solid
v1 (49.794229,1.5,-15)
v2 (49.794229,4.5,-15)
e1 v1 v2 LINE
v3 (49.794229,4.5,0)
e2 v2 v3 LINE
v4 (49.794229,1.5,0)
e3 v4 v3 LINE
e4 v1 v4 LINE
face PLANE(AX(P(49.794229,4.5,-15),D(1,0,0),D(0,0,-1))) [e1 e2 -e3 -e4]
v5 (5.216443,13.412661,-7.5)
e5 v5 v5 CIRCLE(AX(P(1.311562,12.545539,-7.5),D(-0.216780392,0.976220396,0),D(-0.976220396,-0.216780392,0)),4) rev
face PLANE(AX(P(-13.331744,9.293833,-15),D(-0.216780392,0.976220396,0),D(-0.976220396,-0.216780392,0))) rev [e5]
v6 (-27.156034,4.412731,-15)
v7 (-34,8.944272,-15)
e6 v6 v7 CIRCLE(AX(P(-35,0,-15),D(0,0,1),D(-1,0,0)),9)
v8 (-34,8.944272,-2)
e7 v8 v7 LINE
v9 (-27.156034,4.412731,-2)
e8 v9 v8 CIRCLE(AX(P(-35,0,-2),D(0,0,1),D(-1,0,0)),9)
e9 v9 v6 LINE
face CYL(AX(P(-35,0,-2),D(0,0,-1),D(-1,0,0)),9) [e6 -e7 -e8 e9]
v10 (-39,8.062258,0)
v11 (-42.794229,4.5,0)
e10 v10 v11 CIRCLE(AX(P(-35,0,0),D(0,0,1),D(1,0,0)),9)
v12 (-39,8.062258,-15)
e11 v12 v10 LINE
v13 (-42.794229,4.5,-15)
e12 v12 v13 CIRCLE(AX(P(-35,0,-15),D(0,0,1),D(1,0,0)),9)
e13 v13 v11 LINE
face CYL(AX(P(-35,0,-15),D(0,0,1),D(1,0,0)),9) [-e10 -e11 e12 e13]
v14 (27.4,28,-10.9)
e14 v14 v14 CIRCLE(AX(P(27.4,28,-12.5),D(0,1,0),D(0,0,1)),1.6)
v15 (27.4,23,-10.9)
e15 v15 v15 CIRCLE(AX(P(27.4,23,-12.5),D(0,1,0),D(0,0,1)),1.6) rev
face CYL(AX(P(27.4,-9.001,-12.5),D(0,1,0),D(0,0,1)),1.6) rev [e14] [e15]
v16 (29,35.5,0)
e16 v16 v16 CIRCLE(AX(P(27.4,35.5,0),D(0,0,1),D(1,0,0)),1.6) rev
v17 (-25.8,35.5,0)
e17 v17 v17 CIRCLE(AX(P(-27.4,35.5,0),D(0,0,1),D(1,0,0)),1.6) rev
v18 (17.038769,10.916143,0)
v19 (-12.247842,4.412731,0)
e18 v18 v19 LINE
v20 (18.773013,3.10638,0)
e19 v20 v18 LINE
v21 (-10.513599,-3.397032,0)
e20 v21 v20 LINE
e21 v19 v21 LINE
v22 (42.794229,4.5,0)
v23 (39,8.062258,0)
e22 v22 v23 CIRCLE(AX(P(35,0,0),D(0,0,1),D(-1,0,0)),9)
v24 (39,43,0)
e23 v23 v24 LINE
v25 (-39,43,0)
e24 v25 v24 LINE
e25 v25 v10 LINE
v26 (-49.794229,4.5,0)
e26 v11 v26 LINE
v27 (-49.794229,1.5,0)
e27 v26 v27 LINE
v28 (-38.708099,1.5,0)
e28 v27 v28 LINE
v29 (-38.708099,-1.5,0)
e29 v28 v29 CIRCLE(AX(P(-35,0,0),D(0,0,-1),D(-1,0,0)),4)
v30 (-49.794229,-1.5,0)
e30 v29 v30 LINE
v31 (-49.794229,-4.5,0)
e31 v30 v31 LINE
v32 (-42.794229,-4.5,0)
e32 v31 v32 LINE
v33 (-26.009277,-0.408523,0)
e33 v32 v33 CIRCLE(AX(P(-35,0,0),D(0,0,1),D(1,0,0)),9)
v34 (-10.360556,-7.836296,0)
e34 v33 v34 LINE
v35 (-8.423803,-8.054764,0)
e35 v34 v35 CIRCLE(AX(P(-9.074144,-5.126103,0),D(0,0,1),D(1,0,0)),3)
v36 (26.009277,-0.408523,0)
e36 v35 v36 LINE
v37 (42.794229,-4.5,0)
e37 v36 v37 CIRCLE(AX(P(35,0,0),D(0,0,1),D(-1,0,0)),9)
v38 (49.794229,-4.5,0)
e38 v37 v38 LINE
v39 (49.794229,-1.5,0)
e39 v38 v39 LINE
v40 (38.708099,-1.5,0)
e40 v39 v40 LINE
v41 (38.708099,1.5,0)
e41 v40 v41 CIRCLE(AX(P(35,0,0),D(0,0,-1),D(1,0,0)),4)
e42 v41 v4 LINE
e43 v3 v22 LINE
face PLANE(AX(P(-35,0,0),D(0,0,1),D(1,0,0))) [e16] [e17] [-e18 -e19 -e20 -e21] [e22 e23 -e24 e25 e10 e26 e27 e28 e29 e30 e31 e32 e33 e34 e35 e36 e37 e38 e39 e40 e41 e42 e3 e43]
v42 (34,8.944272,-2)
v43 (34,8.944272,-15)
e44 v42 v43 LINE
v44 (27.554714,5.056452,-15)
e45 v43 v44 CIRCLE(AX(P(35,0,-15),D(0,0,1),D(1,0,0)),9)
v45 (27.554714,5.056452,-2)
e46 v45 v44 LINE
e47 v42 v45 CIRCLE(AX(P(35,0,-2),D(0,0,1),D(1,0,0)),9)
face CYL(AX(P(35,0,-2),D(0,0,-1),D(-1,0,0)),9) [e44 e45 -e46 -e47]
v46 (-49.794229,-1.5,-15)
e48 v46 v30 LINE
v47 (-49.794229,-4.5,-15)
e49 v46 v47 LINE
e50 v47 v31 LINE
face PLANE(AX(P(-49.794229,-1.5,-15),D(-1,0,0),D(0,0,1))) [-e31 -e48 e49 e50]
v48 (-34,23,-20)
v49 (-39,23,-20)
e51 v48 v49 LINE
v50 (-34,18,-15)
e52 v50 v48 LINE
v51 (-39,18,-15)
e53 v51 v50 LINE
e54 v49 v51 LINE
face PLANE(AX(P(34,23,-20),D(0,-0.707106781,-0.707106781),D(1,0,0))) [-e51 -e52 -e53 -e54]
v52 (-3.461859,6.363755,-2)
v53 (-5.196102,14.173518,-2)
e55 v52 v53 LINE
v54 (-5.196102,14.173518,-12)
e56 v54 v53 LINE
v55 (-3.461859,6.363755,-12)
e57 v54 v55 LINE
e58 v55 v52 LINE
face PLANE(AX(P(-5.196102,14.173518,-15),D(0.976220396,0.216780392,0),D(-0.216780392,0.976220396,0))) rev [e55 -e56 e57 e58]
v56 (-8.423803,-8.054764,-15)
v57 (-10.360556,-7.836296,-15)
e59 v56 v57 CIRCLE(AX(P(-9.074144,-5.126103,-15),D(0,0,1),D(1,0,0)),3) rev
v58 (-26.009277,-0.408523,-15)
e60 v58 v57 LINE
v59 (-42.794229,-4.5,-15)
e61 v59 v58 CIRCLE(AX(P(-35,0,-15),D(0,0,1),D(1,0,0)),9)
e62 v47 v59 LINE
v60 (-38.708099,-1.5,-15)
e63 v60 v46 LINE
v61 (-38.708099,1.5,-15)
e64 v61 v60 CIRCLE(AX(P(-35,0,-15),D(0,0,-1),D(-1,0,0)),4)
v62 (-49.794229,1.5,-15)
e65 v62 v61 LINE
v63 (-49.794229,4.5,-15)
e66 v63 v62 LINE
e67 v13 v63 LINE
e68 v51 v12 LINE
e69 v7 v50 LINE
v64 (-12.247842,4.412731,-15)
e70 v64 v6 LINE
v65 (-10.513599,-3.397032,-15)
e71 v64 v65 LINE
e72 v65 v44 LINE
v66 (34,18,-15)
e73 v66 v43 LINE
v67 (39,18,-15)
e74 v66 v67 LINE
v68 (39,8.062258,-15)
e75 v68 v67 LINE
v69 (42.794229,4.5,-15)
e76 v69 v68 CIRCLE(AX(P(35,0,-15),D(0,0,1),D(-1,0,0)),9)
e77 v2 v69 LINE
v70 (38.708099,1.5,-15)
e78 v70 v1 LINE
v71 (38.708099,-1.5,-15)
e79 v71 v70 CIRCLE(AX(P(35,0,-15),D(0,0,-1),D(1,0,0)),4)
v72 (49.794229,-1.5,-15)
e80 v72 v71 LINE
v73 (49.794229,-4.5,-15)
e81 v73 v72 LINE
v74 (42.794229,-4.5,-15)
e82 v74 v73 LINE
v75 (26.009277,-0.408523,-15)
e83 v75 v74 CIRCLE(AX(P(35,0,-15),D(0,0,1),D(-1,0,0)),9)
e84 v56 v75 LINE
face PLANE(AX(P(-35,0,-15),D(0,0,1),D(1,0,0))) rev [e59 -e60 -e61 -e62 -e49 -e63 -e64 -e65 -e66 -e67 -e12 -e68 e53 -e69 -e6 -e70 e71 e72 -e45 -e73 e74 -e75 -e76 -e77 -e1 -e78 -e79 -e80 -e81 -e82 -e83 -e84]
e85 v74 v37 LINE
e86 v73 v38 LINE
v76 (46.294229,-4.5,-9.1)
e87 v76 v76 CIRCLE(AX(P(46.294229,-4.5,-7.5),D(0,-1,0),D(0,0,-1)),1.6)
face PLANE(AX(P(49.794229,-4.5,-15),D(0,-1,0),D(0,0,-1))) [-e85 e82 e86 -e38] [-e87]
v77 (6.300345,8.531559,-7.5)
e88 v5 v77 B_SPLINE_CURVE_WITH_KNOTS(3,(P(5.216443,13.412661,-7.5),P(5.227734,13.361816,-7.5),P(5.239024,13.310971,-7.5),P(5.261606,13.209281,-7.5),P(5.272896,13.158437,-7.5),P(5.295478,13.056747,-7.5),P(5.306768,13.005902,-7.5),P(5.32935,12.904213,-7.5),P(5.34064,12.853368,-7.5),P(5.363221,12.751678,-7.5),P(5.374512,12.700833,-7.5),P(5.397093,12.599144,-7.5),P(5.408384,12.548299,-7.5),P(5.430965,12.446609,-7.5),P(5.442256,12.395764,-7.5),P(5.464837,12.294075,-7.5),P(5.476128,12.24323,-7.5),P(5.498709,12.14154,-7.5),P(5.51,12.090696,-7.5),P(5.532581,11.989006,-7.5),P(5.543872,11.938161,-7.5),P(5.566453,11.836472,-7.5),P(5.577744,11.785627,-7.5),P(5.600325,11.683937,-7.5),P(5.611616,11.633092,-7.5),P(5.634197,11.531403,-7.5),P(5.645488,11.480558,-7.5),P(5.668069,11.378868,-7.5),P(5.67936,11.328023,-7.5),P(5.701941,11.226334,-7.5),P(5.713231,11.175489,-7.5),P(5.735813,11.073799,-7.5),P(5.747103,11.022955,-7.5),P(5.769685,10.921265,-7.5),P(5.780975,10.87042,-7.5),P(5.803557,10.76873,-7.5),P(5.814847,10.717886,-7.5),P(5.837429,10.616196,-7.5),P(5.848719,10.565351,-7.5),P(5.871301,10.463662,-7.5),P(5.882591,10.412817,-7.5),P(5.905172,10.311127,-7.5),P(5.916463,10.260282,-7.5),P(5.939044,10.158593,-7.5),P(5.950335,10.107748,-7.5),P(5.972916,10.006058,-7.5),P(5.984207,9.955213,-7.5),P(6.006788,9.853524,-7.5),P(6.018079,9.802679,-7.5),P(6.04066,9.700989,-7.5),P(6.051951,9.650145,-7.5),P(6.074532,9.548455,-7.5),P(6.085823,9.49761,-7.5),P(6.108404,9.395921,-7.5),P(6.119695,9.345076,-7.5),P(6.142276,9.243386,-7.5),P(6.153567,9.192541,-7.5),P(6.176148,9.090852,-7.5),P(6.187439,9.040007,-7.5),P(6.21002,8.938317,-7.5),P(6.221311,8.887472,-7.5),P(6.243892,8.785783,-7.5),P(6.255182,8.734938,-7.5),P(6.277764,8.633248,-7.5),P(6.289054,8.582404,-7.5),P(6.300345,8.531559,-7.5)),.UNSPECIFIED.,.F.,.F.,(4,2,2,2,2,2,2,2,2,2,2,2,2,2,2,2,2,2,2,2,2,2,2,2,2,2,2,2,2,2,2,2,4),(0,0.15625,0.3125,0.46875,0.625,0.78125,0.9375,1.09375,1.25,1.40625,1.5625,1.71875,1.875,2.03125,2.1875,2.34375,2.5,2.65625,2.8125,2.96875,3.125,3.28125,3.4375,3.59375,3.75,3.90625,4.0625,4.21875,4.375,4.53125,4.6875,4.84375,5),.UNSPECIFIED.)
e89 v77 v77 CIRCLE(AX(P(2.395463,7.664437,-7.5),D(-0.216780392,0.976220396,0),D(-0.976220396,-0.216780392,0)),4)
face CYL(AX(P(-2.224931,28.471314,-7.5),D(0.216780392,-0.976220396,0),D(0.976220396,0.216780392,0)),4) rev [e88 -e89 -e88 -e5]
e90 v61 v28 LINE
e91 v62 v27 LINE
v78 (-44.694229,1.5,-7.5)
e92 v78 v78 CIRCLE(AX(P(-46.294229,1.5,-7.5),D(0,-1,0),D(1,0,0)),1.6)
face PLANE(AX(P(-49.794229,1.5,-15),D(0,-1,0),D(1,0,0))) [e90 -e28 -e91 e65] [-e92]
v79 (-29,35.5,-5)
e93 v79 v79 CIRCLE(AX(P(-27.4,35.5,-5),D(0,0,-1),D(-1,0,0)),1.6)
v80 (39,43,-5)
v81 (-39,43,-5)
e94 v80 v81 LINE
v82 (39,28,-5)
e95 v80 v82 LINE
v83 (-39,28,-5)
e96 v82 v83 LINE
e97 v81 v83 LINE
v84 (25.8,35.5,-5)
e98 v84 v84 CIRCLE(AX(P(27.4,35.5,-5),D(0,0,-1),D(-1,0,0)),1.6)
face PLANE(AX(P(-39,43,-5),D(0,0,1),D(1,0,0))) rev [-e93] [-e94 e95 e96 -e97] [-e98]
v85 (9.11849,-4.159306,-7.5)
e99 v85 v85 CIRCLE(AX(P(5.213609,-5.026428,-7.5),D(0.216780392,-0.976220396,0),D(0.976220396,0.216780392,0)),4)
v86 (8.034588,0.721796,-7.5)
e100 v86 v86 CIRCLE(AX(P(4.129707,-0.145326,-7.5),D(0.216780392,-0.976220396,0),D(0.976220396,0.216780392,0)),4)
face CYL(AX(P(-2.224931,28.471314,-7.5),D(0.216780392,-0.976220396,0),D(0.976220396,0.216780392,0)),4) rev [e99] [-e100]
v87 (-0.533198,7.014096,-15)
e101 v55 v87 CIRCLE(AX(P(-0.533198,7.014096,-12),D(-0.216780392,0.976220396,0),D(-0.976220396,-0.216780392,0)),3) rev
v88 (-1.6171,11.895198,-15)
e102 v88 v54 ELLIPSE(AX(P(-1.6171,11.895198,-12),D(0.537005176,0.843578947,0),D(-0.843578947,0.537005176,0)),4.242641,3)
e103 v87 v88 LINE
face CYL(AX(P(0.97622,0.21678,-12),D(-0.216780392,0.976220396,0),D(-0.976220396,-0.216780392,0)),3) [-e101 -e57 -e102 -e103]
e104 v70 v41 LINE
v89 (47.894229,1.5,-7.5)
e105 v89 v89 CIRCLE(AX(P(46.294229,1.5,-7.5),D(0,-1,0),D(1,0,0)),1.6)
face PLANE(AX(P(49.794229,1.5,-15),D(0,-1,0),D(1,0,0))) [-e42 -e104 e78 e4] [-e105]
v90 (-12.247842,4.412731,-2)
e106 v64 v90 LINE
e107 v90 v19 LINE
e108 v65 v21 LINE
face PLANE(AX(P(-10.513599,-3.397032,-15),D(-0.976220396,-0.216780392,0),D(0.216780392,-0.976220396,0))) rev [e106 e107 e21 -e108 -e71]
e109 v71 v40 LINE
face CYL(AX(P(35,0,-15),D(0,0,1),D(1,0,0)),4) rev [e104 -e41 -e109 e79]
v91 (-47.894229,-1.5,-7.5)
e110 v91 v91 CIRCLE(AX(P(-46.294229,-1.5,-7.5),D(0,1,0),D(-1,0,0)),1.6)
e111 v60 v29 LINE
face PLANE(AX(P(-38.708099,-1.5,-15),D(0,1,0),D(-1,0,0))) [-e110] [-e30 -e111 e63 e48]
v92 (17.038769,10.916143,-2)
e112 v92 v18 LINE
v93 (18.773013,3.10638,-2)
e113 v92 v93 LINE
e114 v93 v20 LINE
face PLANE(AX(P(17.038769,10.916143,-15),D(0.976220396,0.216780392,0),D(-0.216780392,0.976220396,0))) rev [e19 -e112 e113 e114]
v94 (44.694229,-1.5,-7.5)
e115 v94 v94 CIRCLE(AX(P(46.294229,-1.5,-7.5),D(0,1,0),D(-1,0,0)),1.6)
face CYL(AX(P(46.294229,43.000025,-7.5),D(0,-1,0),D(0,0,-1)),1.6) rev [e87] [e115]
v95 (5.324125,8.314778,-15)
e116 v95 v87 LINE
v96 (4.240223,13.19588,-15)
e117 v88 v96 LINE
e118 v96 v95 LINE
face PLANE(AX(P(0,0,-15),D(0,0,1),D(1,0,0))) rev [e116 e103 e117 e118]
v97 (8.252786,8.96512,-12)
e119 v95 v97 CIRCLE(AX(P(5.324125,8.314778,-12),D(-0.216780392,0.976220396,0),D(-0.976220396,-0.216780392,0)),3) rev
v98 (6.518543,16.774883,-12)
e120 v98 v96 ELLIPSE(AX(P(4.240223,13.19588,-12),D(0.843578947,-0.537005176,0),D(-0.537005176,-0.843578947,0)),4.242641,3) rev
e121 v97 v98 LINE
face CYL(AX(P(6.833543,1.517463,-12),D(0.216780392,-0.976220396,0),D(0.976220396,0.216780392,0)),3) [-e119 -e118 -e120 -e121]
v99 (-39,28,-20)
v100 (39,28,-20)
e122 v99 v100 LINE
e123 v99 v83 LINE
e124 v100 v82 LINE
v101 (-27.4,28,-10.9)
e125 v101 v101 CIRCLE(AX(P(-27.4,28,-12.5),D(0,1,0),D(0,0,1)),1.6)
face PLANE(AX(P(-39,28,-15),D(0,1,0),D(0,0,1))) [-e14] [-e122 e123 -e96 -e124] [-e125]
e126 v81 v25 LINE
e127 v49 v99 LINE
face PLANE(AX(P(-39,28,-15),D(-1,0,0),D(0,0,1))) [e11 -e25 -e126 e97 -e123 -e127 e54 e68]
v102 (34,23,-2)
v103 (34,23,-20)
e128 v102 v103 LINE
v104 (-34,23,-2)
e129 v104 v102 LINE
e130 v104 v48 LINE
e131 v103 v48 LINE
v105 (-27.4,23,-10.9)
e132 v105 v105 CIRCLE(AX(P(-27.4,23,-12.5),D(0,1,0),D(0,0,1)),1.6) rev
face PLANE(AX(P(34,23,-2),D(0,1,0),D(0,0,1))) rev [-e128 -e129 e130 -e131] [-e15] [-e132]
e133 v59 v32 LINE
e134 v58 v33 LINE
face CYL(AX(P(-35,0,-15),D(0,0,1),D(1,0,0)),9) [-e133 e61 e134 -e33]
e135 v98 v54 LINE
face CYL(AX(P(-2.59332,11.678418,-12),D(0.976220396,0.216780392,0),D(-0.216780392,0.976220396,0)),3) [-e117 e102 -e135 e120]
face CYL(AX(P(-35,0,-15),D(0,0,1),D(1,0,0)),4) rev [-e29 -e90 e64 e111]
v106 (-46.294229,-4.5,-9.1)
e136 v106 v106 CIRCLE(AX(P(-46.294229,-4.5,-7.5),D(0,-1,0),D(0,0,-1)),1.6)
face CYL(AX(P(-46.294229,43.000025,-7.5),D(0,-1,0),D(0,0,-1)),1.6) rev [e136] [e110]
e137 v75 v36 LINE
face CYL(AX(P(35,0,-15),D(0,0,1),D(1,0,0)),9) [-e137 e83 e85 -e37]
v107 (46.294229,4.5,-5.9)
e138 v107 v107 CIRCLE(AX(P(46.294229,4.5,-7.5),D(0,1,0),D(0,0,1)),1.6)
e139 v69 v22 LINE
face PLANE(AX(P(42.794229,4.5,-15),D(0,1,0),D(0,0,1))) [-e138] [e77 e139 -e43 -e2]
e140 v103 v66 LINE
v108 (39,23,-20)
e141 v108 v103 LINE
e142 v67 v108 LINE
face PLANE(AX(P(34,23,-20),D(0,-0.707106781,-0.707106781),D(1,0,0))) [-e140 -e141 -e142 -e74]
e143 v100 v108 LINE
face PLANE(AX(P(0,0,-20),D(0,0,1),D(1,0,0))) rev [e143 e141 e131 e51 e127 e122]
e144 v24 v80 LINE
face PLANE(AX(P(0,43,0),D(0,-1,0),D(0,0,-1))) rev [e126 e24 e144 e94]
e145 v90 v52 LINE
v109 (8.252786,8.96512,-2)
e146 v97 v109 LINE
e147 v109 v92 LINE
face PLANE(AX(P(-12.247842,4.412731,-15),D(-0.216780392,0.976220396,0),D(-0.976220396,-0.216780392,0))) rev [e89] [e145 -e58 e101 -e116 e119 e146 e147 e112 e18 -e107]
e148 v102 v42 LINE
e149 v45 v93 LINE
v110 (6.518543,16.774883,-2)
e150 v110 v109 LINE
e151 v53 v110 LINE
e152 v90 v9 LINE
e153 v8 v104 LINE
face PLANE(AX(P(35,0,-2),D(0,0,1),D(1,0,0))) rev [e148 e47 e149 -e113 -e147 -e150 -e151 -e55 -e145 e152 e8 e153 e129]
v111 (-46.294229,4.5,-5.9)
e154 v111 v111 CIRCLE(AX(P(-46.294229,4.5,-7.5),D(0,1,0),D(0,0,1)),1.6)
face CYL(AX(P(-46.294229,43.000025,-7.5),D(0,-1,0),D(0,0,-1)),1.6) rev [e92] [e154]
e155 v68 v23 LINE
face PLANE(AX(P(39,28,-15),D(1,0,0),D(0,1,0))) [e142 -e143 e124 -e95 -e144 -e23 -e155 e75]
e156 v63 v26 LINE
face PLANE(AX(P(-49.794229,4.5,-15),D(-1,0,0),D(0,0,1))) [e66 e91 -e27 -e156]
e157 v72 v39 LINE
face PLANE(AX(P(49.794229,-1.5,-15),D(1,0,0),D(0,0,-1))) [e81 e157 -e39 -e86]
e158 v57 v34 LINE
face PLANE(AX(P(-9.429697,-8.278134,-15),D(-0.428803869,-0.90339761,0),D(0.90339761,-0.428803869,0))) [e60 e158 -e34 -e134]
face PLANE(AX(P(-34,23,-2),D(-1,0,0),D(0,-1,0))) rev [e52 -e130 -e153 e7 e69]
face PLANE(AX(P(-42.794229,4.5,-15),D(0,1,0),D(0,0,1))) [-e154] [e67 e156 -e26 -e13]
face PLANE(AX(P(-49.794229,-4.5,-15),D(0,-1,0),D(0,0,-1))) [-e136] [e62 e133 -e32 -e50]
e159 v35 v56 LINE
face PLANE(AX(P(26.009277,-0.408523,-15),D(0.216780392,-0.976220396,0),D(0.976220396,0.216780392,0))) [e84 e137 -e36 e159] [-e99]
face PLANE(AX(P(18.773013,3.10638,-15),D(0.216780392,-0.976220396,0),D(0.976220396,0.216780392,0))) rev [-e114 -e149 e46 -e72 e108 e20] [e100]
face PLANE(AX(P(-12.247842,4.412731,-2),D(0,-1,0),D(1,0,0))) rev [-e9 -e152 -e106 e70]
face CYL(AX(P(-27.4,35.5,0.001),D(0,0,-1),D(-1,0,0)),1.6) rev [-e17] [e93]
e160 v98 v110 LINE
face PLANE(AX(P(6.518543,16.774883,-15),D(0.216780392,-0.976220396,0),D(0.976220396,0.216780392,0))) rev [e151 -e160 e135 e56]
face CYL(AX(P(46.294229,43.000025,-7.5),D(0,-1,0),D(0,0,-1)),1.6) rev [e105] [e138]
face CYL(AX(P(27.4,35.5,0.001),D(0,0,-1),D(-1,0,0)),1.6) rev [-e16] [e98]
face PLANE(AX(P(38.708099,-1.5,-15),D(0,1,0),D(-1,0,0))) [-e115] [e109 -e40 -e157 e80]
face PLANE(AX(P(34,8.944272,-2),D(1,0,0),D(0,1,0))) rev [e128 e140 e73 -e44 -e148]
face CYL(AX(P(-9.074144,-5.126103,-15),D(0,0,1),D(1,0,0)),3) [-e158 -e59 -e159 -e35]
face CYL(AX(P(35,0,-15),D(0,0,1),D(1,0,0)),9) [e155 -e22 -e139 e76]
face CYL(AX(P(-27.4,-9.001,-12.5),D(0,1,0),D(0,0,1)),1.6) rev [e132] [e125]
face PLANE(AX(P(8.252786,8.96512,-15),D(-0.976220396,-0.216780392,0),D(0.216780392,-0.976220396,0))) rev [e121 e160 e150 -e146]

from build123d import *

# Parameters (mm, degrees)
BOSS_EXTRUDE1_DEPTH = 15
CUT_EXTRUDE1_START  = -13
CUT_EXTRUDE1_DEPTH  = 13
BOSS_EXTRUDE2_DEPTH = 13
SKETCH5_R           = 4
CUT_EXTRUDE2_DEPTH  = 18
SKETCH6_W           = 78
SKETCH6_H           = 5
BOSS_EXTRUDE3_DEPTH = 15
SKETCH7_W           = 78
SKETCH7_H           = 5
BOSS_EXTRUDE4_DEPTH = 5
CUT_EXTRUDE3_REACH  = 69.479
SKETCH8_R           = 1.6
CUT_EXTRUDE4_REACH  = 67.18
SKETCH9_R           = 1.6
CHAMFER1_SIZE       = 5
FILLET1_R           = 3
FILLET2_R           = 3
SKETCH10_R          = 1.6
CUT_EXTRUDE5_DEPTH  = 72.66390448


with BuildPart() as part:
    # Sketch2 → Boss-Extrude1 (new body)
    with BuildSketch(Plane.XY):
        with BuildLine():
            Line((-39, 28), (39, 28))
            Line((39, 28), (39, 8.062257748))
            ThreePointArc((39, 8.062257748), (41.160225429, 6.561373535), (42.794228634, 4.5))
            Line((42.794228634, 4.5), (49.794228634, 4.5))
            Line((49.794228634, 4.5), (49.794228634, 1.5))
            Line((49.794228634, 1.5), (38.708099244, 1.5))
            ThreePointArc((38.708099244, 1.5), (31, 0), (38.708099244, -1.5))
            Line((38.708099244, -1.5), (49.794228634, -1.5))
            Line((49.794228634, -1.5), (49.794228634, -4.5))
            Line((49.794228634, -4.5), (42.794228634, -4.5))
            ThreePointArc((42.794228634, -4.5), (32.868581203, -8.743972433), (26.009276503, -0.408522957))
            Line((26.009276503, -0.408522957), (-9.429697367, -8.278133847))
            Line((-9.429697367, -8.278133847), (-26.009276503, -0.408522957))
            ThreePointArc((-26.009276503, -0.408522957), (-32.868581203, -8.743972433), (-42.794228634, -4.5))
            Line((-42.794228634, -4.5), (-49.794228634, -4.5))
            Line((-49.794228634, -4.5), (-49.794228634, -1.5))
            Line((-49.794228634, -1.5), (-38.708099244, -1.5))
            ThreePointArc((-38.708099244, -1.5), (-31, 0), (-38.708099244, 1.5))
            Line((-38.708099244, 1.5), (-49.794228634, 1.5))
            Line((-49.794228634, 1.5), (-49.794228634, 4.5))
            Line((-49.794228634, 4.5), (-42.794228634, 4.5))
            ThreePointArc((-42.794228634, 4.5), (-41.160225429, 6.561373535), (-39, 8.062257748))
            Line((-39, 8.062257748), (-39, 28))
        make_face()
        Polygon((-10.513599328, -3.397031867), (-12.247842467, 4.4127313), (17.038769412, 10.916143071), (18.773012551, 3.106379903), align=None, mode=Mode.SUBTRACT)
    extrude(amount=-BOSS_EXTRUDE1_DEPTH)

    # Sketch3 → Cut-Extrude1 (cut)
    with BuildSketch(Plane(origin=(0, 0, -15), x_dir=(-1, 0, 0), z_dir=(0, 0, -1)).offset(CUT_EXTRUDE1_START)):
        with BuildLine():
            Line((-34, 8.94427191), (-34, 23))
            Line((-34, 23), (34, 23))
            Line((34, 23), (34, 8.94427191))
            ThreePointArc((34, 8.94427191), (30.031333309, 7.504155603), (27.156034009, 4.4127313))
            Line((27.156034009, 4.4127313), (12.247842467, 4.4127313))
            Line((12.247842467, 4.4127313), (10.513599328, -3.397031867))
            Line((10.513599328, -3.397031867), (-27.55471368, 5.056452473))
            ThreePointArc((-27.55471368, 5.056452473), (-30.351398032, 7.706523194), (-34, 8.94427191))
        make_face()
    extrude(amount=CUT_EXTRUDE1_DEPTH, mode=Mode.SUBTRACT)

    # Sketch4 → Boss-Extrude2 (add)
    with BuildSketch(Plane(origin=(0, 0, -2), x_dir=(-1, 0, 0), z_dir=(0, 0, -1))):
        Polygon((-8.252785849, 8.96511954), (-6.51854271, 16.774882707), (5.196102042, 14.173517999), (3.461858903, 6.363754831), align=None)
    extrude(amount=BOSS_EXTRUDE2_DEPTH)

    # Sketch5 → Cut-Extrude2 (cut)
    with BuildSketch(Plane(origin=(1.308726989, -5.893549531, 0), x_dir=(0.9762203959642156, 0.21678039234089003, 0), z_dir=(0.21678039234089003, -0.9762203959642156, 0))):
        with Locations((4, -7.5)):
            Circle(SKETCH5_R)
    extrude(amount=-CUT_EXTRUDE2_DEPTH, mode=Mode.SUBTRACT)

    # Sketch6 → Boss-Extrude3 (add)
    with BuildSketch(Plane(origin=(0, 28, 0), x_dir=(1, 0, 0), z_dir=(0, 1, 0))):
        with Locations((0, 2.5)):
            Rectangle(SKETCH6_W, SKETCH6_H)
    extrude(amount=BOSS_EXTRUDE3_DEPTH)

    # Sketch7 → Boss-Extrude4 (add)
    with BuildSketch(Plane(origin=(0, 0, -15), x_dir=(-1, 0, 0), z_dir=(0, 0, -1))):
        with Locations((0, 25.5)):
            Rectangle(SKETCH7_W, SKETCH7_H)
    extrude(amount=BOSS_EXTRUDE4_DEPTH)

    # Sketch8 → Cut-Extrude3 (cut, up to next)
    with BuildSketch(Plane(origin=(0, 0, -5), x_dir=(-1, 0, 0), z_dir=(0, 0, -1)), mode=Mode.PRIVATE) as cut_extrude3_sk1:
        with Locations((27.4, 35.5)):
            Circle(SKETCH8_R)
    cut_extrude3_tool1 = extrude(cut_extrude3_sk1.sketch, amount=-CUT_EXTRUDE3_REACH, mode=Mode.PRIVATE) & part.part
    # Sketch8 → Cut-Extrude3 (cut, up to next)
    with BuildSketch(Plane(origin=(0, 0, -5), x_dir=(-1, 0, 0), z_dir=(0, 0, -1)), mode=Mode.PRIVATE) as cut_extrude3_sk2:
        with Locations((-27.4, 35.5)):
            Circle(SKETCH8_R)
    cut_extrude3_tool2 = extrude(cut_extrude3_sk2.sketch, amount=-CUT_EXTRUDE3_REACH, mode=Mode.PRIVATE) & part.part
    add(cut_extrude3_tool1.solids().sort_by_distance((-27.4, 35.5, -5))[0], mode=Mode.SUBTRACT)
    add(cut_extrude3_tool2.solids().sort_by_distance((27.4, 35.5, -5))[0], mode=Mode.SUBTRACT)

    # Sketch9 → Cut-Extrude4 (cut, up to next)
    with BuildSketch(Plane(origin=(0, 28, 0), x_dir=(1, 0, 0), z_dir=(0, 1, 0)), mode=Mode.PRIVATE) as cut_extrude4_sk1:
        with Locations(Location((-27.4, 12.5, 0), (0, 0, 270))):
            Circle(SKETCH9_R)
    cut_extrude4_tool1 = extrude(cut_extrude4_sk1.sketch, amount=-CUT_EXTRUDE4_REACH, mode=Mode.PRIVATE) & part.part
    # Sketch9 → Cut-Extrude4 (cut, up to next)
    with BuildSketch(Plane(origin=(0, 28, 0), x_dir=(1, 0, 0), z_dir=(0, 1, 0)), mode=Mode.PRIVATE) as cut_extrude4_sk2:
        with Locations(Location((27.4, 12.5, 0), (0, 0, 270))):
            Circle(SKETCH9_R)
    cut_extrude4_tool2 = extrude(cut_extrude4_sk2.sketch, amount=-CUT_EXTRUDE4_REACH, mode=Mode.PRIVATE) & part.part
    add(cut_extrude4_tool1.solids().sort_by_distance((-27.4, 28, -12.5))[0], mode=Mode.SUBTRACT)
    add(cut_extrude4_tool2.solids().sort_by_distance((27.4, 28, -12.5))[0], mode=Mode.SUBTRACT)

    # Chamfer1
    chamfer1_edges = [part.edges().sort_by_distance(p)[0] for p in [
        (36.5, 23, -15),
        (-36.5, 23, -15),
    ]]
    chamfer(chamfer1_edges, length=CHAMFER1_SIZE - 0.0001)  # a hair under: the kernel refuses the full size

    # Fillet1
    fillet1_edges = [part.edges().sort_by_distance(p)[0] for p in [
        (-4.328980472, 10.268636415, -15),
        (0.661220334, 15.474200353, -15),
        (7.385664279, 12.870001123, -15),
    ]]
    fillet(fillet1_edges, radius=FILLET1_R)

    # Fillet2
    fillet2_edges = [part.edges().sort_by_distance(p)[0] for p in [
        (-9.429697367, -8.278133847, -7.5),
    ]]
    fillet(fillet2_edges, radius=FILLET2_R)

    # Sketch10 → Cut-Extrude5 (cut, through all)
    with BuildSketch(Plane.XZ.offset(4.5)):
        with Locations(Location((46.294228634, -7.5, 0), (0, 0, 270))):
            Circle(SKETCH10_R)
        with Locations((-46.294228634, -7.5)):
            Circle(SKETCH10_R)
    extrude(amount=-CUT_EXTRUDE5_DEPTH, mode=Mode.SUBTRACT)


solid = part.part
